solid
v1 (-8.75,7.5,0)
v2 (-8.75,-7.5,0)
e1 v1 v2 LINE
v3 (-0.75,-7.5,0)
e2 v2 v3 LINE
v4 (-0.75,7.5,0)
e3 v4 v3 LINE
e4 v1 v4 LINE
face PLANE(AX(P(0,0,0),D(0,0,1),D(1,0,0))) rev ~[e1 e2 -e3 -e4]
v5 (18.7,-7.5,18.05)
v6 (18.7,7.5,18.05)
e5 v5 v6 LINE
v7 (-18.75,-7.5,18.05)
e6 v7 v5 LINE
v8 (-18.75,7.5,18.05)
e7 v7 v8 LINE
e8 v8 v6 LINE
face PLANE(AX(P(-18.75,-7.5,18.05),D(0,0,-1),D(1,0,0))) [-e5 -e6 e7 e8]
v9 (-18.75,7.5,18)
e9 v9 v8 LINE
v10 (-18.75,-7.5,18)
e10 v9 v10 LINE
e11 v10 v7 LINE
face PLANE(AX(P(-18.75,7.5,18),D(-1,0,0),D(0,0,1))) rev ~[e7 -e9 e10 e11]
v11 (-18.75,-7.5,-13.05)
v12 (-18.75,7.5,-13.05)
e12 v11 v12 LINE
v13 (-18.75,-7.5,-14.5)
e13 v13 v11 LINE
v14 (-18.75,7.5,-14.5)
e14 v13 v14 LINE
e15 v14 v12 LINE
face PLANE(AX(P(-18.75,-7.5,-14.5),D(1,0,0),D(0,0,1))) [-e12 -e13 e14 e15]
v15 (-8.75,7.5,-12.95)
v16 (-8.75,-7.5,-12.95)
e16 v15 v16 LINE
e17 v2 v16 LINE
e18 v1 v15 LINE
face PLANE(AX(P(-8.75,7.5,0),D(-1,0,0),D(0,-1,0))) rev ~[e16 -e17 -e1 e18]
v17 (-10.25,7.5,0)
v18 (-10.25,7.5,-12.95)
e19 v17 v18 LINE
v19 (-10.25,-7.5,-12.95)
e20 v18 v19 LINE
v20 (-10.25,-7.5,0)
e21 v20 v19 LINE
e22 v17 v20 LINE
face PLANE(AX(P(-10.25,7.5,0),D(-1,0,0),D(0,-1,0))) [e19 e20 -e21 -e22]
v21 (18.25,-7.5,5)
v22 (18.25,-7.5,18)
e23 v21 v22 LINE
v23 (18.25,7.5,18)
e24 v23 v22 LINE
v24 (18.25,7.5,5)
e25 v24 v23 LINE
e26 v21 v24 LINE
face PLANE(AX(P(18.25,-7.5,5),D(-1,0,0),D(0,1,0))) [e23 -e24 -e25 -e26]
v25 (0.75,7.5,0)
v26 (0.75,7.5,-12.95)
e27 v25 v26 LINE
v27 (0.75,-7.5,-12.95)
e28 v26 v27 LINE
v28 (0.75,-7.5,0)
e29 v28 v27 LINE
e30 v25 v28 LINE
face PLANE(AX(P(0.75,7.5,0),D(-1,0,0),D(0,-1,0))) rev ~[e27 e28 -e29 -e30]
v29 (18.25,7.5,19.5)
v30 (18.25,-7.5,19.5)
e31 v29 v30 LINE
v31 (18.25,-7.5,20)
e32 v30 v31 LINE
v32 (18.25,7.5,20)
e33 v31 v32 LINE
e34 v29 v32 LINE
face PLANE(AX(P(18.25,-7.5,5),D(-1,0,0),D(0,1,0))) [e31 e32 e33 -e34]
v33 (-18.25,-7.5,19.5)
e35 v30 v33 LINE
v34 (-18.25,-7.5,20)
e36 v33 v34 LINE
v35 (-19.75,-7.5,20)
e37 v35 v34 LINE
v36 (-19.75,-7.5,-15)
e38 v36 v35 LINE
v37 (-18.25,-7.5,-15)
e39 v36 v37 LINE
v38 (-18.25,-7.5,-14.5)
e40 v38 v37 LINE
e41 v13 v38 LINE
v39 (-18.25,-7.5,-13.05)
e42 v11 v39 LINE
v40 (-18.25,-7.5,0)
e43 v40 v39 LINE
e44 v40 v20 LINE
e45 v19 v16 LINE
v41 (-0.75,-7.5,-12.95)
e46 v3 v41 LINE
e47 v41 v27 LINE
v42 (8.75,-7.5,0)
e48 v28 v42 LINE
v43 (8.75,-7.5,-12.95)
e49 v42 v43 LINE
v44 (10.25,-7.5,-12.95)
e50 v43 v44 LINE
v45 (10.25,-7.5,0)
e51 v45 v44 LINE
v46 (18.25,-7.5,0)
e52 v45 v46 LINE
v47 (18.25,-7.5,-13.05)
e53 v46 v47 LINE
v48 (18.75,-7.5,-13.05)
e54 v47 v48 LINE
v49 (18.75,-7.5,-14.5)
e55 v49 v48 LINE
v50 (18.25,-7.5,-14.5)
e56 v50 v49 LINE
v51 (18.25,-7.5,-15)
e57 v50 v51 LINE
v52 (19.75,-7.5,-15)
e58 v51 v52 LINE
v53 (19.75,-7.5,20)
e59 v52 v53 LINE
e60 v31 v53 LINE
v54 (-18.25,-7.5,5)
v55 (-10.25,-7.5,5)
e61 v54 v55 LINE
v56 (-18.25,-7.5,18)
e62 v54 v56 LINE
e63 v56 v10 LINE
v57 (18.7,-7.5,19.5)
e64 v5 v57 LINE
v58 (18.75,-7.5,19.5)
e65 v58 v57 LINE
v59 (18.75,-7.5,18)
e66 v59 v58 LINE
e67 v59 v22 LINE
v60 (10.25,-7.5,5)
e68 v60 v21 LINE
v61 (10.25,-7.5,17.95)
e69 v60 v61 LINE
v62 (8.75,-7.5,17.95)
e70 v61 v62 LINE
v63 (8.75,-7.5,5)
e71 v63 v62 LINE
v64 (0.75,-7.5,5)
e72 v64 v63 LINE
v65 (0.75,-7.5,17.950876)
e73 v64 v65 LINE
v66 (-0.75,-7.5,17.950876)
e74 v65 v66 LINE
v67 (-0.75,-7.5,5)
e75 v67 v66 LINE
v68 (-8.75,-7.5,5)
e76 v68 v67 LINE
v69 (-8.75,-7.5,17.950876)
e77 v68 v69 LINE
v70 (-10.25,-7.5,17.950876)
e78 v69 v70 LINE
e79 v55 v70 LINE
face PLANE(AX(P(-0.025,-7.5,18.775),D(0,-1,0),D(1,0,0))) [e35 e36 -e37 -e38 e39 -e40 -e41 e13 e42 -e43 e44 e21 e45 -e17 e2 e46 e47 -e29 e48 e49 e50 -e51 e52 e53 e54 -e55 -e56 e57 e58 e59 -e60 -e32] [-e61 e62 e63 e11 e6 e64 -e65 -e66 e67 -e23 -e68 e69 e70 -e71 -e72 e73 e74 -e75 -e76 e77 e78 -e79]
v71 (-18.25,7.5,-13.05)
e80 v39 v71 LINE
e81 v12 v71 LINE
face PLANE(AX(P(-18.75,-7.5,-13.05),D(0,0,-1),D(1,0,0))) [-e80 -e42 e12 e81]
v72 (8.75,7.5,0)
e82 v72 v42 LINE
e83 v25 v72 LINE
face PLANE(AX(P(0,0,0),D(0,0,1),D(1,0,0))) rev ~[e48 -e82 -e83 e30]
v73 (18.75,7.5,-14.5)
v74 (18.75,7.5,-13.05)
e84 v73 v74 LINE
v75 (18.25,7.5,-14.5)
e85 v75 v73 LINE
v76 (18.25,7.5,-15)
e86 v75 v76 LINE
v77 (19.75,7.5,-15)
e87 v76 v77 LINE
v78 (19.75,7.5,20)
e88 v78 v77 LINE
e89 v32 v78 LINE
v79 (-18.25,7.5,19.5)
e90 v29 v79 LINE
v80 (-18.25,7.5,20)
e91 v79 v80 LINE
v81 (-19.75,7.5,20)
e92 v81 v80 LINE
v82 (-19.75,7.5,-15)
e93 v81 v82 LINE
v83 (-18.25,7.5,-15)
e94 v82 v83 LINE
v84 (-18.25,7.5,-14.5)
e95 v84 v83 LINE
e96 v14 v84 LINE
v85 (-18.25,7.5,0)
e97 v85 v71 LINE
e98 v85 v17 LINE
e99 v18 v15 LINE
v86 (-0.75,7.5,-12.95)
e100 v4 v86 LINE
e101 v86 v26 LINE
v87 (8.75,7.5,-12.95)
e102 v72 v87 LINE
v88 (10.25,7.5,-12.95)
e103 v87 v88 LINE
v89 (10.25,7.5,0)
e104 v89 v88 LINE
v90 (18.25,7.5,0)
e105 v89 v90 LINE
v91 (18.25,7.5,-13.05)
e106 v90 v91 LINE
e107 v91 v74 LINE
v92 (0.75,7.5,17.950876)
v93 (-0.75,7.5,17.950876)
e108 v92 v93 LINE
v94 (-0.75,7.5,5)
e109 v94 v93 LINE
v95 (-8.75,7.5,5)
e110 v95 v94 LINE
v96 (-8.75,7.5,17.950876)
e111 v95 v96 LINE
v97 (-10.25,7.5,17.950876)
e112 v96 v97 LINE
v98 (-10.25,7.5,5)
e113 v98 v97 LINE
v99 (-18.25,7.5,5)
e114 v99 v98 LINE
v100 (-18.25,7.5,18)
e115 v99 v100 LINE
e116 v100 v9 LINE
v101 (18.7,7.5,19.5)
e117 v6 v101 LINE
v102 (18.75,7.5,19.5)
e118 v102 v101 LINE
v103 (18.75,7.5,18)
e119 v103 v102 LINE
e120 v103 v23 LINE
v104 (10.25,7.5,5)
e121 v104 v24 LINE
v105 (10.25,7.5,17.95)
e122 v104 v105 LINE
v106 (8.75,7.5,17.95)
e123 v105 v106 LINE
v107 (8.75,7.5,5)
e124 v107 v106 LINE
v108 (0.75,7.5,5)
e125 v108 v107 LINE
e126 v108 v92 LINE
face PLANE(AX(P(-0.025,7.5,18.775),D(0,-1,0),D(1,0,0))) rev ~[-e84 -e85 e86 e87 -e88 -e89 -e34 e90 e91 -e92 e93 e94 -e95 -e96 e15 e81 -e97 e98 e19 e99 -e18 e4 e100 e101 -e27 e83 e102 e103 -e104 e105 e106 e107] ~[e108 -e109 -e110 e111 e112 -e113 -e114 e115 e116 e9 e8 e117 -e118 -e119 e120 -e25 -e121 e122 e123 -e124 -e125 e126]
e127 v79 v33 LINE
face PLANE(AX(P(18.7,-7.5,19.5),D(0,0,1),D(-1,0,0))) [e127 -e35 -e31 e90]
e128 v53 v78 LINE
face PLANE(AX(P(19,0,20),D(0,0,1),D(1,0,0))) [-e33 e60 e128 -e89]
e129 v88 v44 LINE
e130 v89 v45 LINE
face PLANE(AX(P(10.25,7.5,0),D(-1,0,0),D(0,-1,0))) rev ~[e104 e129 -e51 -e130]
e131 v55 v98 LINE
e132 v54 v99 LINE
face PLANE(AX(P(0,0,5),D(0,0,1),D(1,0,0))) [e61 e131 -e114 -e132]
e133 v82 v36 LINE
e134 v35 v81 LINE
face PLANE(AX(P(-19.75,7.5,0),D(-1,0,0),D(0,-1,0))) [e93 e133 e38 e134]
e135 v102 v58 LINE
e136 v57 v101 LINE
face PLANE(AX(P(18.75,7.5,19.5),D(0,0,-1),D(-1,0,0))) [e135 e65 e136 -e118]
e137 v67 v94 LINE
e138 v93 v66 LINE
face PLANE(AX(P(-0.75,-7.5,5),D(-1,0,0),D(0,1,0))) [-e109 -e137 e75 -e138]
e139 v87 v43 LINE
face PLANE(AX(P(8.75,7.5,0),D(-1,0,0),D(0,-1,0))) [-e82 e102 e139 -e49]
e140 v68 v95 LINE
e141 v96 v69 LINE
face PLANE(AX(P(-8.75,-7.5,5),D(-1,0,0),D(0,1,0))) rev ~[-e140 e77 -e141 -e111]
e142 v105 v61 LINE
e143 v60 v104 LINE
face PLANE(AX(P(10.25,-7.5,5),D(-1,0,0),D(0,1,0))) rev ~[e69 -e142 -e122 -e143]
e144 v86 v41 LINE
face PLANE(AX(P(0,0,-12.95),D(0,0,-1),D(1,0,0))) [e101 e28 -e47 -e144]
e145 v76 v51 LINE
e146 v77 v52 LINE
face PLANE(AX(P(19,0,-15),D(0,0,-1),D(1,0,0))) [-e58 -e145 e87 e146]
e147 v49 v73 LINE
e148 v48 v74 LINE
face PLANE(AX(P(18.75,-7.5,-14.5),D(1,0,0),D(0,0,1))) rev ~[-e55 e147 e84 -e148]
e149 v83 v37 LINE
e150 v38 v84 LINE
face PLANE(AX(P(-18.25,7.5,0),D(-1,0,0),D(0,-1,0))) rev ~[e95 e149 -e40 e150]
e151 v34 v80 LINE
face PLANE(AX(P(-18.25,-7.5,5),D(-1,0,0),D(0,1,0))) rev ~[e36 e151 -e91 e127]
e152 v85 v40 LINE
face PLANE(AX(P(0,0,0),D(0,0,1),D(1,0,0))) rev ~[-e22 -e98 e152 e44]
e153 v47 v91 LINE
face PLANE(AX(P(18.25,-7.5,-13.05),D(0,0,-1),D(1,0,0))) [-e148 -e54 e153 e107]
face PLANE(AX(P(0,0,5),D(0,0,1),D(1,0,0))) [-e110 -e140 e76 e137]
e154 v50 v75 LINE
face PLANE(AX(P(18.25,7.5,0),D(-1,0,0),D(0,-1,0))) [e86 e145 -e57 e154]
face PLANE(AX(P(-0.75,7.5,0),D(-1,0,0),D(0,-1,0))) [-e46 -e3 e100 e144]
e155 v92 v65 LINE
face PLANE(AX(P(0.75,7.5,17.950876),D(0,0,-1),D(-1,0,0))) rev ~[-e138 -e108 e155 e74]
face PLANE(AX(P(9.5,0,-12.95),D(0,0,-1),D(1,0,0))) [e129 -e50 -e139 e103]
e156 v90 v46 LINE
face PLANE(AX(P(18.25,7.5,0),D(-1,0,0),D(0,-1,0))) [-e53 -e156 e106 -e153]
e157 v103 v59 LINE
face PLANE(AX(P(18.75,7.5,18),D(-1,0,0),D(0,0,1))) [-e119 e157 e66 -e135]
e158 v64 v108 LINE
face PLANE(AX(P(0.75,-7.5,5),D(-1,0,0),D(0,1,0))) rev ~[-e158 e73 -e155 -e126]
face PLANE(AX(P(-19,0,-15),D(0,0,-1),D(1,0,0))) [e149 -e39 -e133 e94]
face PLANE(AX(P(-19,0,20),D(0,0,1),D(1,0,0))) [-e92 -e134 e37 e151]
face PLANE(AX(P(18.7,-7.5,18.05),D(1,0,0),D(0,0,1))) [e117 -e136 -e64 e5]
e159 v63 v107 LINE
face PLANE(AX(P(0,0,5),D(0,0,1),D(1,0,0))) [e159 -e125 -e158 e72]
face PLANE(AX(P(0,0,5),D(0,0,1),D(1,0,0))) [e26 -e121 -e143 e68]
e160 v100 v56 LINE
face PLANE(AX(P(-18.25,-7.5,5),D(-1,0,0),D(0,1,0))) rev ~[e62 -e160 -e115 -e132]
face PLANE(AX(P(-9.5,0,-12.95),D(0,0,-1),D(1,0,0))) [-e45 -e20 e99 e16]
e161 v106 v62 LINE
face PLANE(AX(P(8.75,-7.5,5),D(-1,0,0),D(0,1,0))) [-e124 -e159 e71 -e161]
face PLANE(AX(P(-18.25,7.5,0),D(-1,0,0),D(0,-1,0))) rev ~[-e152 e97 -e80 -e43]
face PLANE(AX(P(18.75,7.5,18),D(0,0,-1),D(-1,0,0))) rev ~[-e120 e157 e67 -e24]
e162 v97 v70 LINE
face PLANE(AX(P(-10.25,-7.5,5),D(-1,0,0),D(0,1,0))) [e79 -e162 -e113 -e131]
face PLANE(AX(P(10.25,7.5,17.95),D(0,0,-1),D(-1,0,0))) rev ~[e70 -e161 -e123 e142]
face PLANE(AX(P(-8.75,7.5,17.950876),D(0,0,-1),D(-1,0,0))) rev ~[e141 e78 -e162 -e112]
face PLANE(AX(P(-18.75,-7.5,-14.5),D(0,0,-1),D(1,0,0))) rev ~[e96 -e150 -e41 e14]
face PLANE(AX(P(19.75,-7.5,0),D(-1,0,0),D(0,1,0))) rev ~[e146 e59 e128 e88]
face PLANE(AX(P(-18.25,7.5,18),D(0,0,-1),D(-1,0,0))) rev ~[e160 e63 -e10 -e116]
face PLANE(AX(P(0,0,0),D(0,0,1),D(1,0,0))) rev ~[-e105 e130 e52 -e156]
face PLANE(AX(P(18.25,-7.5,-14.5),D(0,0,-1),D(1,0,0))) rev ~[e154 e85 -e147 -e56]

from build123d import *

# Parameters (mm, degrees)
F0_W      = 39.5
F0_H      = 15
F1_DEPTH  = 5
F2_W      = 1.5
F2_H      = 15
F3_DEPTH  = 15
F5_W      = 1.5
F5_H      = 15
F6_DEPTH  = 15
F7_DEPTH  = 12.95
F9_W      = 0.5
F9_H      = 1.5
F10_DEPTH = 15
F9_W_2    = 1.5
F9_H_2    = 2.05
F9_H_3    = 2.0491243154
F11_DEPTH = 15
F13_DEPTH = 15
F14_W     = 0.5
F14_H     = 1.45
F15_DEPTH = 15


# Not quite as in the source:
# - the program builds the solid bodies; features that only make, move or delete a surface that nothing else refers to are left out


with BuildPart() as f1:
    # F0 (on Top) → F1 (new body)
    with BuildSketch(Plane.XY):
        Rectangle(F0_W, F0_H)
    extrude(amount=F1_DEPTH)

    # F2 (on face) → F3 (join)
    with BuildSketch(Plane.XY.offset(5)):
        with Locations((-19, 0)):
            Rectangle(F2_W, F2_H)
        with Locations((-9.5, 0)):
            Rectangle(F2_W, F2_H)
        Rectangle(F2_W, F2_H)
        with Locations((9.5, 0)):
            Rectangle(F2_W, F2_H)
        with Locations((19, 0)):
            Rectangle(F2_W, F2_H)
    extrude(amount=F3_DEPTH)

    # F5 (on face) → F6 (join)
    with BuildSketch(Plane(origin=(0, 0, 0), x_dir=(1, 0, 0), z_dir=(0, 0, -1))):
        with Locations((-19, 0)):
            Rectangle(F5_W, F5_H)
        with Locations((19, 0)):
            Rectangle(F5_W, F5_H)
    extrude(amount=F6_DEPTH)

    # F5 (on face) → F7 (join)
    with BuildSketch(Plane(origin=(0, 0, 0), x_dir=(1, 0, 0), z_dir=(0, 0, -1))):
        with Locations((-9.5, 0)):
            Rectangle(F5_W, F5_H)
        Rectangle(F5_W, F5_H)
        with Locations((9.5, 0)):
            Rectangle(F5_W, F5_H)
    extrude(amount=F7_DEPTH)

    # F9 (on face) → F10 (cut)
    with BuildSketch(Plane(origin=(0, 7.5, 0), x_dir=(-1, 0, 0), z_dir=(0, 1, 0))):
        with Locations((18.5, 18.75)):
            Rectangle(F9_W, F9_H)
        with Locations((-18.5, 18.75)):
            Rectangle(F9_W, F9_H)
    extrude(amount=-F10_DEPTH, mode=Mode.SUBTRACT)

    # F9 (on face) → F11 (cut)
    with BuildSketch(Plane(origin=(0, 7.5, 0), x_dir=(-1, 0, 0), z_dir=(0, 1, 0))):
        with Locations((-9.5, 18.975)):
            Rectangle(F9_W_2, F9_H_2)
        with Locations((0, 18.9754378423)):
            Rectangle(F9_W_2, F9_H_3)
        with Locations((9.5, 18.9754378423)):
            Rectangle(F9_W_2, F9_H_3)
    extrude(amount=-F11_DEPTH, mode=Mode.SUBTRACT)

    # F12 (on face) → F13 (join)
    with BuildSketch(Plane.XZ.offset(7.5)):
        Polygon((-18.25, 19.5), (-18.75, 19.5), (-18.75, 18.05), (18.7, 18.05), (18.7, 19.5), (18.25, 19.5), align=None)
    extrude(amount=-F13_DEPTH)

    # F14 (on face) → F15 (cut)
    with BuildSketch(Plane.XZ.offset(7.5)):
        with Locations((18.5, -13.775)):
            Rectangle(F14_W, F14_H)
        with Locations((-18.5, -13.775)):
            Rectangle(F14_W, F14_H)
    extrude(amount=-F15_DEPTH, mode=Mode.SUBTRACT)


solid = f1.part
